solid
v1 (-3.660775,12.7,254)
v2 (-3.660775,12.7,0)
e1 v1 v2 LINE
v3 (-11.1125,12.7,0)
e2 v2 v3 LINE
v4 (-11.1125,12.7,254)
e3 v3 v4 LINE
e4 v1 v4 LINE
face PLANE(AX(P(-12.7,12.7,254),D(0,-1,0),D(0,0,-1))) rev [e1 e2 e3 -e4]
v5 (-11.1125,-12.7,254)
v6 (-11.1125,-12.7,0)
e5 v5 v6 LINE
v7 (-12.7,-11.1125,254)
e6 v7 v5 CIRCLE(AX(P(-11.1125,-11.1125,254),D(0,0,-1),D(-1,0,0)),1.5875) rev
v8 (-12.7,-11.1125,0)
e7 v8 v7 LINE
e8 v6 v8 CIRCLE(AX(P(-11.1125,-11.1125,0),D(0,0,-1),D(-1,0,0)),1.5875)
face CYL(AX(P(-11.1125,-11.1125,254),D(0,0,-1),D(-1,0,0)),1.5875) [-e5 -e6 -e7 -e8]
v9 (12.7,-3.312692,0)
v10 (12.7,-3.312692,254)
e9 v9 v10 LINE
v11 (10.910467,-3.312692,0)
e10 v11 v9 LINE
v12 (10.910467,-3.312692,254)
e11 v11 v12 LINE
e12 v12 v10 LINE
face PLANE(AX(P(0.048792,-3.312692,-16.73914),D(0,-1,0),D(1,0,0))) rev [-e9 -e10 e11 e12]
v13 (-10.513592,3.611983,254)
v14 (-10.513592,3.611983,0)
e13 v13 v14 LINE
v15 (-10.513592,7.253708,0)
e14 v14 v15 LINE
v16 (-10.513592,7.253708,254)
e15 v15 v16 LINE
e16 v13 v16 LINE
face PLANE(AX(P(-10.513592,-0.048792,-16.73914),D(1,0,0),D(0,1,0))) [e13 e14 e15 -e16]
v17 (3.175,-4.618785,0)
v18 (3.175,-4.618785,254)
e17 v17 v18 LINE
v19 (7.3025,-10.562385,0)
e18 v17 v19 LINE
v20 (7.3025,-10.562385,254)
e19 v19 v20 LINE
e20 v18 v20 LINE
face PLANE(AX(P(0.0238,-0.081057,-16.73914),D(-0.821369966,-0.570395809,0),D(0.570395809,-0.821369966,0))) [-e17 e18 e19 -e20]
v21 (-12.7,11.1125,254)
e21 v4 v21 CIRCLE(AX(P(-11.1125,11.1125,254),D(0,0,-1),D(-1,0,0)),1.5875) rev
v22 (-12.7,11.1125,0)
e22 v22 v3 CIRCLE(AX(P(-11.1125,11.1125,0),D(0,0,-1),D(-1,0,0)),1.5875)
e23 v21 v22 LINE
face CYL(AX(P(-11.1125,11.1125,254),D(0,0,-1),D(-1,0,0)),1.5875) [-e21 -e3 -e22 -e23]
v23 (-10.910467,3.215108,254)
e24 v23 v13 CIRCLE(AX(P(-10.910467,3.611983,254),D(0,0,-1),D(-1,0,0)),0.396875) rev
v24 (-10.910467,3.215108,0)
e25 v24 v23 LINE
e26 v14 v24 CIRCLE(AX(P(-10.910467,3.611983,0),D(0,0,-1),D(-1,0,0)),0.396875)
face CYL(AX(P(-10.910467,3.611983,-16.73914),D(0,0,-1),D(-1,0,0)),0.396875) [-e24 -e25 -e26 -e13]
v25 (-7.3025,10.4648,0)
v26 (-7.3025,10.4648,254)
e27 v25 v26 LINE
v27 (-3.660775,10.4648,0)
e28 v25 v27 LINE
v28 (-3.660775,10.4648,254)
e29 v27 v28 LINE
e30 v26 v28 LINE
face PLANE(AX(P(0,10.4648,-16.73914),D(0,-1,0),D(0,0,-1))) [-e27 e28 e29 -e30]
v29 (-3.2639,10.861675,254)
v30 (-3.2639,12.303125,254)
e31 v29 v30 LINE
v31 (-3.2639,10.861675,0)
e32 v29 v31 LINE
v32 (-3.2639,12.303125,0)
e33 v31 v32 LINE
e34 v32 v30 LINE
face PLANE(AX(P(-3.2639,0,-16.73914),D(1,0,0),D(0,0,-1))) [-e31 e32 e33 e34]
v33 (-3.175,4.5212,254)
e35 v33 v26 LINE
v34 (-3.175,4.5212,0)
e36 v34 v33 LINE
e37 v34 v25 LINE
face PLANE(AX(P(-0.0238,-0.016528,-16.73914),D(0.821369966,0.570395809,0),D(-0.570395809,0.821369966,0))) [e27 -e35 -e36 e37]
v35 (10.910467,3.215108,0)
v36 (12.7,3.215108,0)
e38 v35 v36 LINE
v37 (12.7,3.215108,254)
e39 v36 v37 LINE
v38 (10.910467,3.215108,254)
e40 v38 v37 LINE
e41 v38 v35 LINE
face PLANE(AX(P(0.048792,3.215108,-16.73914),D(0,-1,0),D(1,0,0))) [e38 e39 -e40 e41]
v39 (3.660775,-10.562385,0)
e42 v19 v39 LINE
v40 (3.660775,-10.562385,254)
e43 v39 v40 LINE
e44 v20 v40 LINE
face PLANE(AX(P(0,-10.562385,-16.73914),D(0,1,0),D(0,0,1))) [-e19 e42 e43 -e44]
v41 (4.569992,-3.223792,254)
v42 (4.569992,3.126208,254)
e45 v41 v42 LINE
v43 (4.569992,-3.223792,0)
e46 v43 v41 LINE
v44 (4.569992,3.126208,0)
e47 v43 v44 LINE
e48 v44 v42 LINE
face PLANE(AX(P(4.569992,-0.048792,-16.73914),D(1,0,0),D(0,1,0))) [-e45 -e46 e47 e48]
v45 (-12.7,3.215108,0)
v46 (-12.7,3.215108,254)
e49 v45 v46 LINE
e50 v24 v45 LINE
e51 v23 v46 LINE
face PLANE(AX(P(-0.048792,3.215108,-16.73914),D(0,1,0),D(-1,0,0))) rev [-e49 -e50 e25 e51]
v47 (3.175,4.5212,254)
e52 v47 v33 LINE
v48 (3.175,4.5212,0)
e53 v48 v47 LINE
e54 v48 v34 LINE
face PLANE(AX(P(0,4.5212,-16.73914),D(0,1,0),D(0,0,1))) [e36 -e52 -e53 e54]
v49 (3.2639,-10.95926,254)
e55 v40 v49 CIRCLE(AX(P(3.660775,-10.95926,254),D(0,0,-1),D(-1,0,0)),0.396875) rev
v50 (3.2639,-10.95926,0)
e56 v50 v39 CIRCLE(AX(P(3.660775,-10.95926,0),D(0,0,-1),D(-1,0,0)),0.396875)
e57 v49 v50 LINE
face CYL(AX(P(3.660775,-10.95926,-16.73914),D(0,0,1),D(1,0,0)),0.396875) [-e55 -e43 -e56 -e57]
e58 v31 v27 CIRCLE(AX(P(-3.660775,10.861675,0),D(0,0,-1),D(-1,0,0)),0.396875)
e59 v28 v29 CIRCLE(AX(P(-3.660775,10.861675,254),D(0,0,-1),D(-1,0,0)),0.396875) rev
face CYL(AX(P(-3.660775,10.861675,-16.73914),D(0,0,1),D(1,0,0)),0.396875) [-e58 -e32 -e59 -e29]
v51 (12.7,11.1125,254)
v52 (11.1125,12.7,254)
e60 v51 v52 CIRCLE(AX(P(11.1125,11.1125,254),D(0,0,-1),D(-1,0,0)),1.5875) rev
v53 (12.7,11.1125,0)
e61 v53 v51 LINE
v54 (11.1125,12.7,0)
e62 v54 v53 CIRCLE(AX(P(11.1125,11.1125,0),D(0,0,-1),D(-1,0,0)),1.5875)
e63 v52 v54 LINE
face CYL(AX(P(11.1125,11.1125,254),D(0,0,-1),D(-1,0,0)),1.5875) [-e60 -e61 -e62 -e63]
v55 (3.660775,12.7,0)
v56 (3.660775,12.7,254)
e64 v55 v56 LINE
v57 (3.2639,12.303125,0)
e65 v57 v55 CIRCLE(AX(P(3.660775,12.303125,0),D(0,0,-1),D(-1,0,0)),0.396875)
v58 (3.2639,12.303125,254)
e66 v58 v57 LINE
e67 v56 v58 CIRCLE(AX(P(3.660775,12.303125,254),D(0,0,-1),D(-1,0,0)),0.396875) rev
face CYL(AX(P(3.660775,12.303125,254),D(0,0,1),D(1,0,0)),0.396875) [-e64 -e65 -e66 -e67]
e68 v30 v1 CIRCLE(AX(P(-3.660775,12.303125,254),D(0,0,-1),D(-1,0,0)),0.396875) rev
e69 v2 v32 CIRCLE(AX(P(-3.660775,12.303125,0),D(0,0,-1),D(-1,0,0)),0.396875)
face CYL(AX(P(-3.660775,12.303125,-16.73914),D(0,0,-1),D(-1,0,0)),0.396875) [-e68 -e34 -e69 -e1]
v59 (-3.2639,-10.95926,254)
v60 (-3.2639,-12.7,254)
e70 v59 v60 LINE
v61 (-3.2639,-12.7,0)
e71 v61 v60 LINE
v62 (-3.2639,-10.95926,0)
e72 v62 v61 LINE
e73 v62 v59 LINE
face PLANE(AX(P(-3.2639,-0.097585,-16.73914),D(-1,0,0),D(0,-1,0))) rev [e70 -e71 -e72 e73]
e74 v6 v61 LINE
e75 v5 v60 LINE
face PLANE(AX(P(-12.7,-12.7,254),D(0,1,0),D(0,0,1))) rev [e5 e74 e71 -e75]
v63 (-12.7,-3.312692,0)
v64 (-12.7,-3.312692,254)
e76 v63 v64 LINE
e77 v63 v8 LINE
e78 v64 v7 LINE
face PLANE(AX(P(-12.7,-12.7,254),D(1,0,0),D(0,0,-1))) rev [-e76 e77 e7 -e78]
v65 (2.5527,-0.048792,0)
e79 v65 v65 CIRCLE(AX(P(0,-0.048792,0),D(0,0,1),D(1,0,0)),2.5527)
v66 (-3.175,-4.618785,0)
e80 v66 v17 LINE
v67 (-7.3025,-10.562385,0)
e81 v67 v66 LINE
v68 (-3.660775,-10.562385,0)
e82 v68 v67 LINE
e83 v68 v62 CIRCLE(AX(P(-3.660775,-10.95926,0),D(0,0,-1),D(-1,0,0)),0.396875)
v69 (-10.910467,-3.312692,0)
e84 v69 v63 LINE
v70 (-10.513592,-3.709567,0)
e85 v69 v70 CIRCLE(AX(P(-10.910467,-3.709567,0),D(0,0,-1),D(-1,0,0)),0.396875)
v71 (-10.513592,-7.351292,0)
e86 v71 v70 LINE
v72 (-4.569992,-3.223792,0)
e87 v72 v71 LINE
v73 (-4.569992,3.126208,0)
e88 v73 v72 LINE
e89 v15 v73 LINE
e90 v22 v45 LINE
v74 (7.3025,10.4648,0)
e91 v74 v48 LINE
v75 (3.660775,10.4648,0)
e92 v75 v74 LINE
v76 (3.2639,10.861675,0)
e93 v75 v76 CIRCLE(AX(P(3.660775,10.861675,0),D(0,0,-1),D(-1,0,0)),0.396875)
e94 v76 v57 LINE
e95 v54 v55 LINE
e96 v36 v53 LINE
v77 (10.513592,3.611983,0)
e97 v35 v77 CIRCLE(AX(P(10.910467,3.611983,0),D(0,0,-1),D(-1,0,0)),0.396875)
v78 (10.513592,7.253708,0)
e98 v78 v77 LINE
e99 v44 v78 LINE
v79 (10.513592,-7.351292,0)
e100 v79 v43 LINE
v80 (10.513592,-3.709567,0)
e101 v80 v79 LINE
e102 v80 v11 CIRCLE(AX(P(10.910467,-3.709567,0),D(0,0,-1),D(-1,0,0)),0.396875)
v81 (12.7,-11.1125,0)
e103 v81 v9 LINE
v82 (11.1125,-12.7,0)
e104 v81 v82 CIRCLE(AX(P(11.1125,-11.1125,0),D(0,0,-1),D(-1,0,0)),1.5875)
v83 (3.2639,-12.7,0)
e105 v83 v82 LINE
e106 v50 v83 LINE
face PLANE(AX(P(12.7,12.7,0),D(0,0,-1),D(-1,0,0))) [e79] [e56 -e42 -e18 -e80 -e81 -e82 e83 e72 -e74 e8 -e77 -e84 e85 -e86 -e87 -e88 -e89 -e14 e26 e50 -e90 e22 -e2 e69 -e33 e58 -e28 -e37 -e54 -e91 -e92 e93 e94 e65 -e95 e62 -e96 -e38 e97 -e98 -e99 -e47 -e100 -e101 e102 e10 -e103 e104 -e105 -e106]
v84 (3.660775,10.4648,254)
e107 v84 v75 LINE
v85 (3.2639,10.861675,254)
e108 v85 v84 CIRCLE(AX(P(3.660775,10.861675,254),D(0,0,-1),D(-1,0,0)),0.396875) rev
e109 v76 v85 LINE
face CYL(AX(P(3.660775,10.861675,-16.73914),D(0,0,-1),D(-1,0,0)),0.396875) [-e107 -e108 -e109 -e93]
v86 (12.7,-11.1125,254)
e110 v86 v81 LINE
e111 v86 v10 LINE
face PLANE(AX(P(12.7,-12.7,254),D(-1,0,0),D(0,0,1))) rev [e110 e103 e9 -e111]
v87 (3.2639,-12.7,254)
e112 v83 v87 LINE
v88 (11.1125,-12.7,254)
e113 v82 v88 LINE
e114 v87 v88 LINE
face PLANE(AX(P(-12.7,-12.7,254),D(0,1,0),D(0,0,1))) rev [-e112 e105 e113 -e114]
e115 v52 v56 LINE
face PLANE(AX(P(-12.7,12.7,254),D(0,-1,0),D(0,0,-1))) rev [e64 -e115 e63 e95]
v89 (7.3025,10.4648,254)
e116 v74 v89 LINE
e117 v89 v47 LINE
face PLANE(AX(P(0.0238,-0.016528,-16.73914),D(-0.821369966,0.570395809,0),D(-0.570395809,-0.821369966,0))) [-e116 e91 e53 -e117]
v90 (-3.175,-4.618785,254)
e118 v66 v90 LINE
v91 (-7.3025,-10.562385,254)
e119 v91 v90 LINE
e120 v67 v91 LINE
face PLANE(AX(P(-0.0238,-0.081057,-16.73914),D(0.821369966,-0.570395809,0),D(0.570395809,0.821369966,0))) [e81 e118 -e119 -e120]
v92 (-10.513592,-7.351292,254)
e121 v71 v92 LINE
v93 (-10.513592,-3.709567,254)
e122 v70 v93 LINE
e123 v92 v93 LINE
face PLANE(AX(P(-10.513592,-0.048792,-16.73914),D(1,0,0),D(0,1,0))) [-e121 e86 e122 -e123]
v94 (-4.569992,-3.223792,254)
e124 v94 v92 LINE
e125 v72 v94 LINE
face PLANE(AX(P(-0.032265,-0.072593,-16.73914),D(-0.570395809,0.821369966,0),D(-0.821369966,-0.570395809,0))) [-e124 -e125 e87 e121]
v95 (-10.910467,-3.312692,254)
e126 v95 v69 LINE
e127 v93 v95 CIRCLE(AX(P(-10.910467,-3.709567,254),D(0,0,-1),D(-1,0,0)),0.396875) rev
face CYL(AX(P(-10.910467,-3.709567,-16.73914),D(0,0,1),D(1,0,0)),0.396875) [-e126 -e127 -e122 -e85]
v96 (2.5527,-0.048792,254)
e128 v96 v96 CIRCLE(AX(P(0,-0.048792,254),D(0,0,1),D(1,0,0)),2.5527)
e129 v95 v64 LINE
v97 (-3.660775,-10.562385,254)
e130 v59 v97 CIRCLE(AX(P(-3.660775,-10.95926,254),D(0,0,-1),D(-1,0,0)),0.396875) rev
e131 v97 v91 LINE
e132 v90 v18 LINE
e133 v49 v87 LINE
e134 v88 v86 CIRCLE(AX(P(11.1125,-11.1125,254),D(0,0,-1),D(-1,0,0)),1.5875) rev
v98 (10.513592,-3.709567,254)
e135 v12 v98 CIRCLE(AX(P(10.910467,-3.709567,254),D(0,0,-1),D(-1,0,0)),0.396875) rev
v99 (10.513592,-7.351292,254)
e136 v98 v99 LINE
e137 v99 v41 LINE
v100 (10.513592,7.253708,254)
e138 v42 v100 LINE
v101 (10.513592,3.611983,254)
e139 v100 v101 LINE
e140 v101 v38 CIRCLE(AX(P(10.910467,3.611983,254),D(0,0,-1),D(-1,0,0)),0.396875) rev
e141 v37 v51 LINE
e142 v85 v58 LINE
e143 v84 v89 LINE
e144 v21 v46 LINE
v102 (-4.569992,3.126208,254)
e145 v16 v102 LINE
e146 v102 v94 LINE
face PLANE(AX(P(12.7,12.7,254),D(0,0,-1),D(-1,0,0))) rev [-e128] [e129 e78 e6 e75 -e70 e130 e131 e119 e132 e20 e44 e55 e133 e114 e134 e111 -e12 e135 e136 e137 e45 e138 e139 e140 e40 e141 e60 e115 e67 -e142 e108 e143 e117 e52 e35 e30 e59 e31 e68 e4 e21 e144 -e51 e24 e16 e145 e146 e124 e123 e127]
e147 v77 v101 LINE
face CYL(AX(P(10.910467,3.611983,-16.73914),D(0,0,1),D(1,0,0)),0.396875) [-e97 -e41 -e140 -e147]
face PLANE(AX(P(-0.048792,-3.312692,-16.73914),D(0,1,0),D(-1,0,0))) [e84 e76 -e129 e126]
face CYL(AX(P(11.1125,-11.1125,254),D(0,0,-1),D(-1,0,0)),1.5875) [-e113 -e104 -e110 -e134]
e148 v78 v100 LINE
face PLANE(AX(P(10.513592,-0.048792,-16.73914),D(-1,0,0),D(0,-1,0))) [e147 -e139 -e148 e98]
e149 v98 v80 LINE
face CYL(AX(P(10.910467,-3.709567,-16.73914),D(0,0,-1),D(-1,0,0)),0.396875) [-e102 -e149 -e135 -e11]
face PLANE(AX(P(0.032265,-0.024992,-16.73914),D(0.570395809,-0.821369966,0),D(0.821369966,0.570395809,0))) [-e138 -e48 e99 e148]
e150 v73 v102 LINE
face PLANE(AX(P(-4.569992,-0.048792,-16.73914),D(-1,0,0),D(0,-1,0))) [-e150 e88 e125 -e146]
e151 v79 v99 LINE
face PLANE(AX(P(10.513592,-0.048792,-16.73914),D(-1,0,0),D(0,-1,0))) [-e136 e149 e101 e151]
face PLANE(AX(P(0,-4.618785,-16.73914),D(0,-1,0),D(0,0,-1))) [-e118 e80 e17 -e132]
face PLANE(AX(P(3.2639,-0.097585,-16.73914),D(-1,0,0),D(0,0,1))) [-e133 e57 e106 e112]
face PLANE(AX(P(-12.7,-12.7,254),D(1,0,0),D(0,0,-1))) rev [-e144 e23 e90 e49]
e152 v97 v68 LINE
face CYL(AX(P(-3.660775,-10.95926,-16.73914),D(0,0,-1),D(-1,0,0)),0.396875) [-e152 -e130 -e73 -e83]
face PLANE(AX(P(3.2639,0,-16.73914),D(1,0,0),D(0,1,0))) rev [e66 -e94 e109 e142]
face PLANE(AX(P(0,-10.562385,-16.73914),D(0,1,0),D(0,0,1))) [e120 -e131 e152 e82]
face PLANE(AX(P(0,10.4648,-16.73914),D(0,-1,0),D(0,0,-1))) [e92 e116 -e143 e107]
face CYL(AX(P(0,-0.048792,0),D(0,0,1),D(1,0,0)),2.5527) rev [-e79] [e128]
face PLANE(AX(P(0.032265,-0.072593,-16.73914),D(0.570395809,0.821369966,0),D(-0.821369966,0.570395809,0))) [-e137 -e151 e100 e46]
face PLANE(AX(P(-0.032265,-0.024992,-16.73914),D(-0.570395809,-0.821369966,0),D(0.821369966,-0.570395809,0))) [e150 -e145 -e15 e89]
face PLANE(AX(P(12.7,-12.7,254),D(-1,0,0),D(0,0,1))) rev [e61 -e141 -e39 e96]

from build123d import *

# Parameters (mm, degrees)
SKETCH1_W           = 25.4
SKETCH1_H           = 25.4
BOSS_EXTRUDE1_DEPTH = 254
FILLET1_R           = 1.5875
HOLE1_OUTLINE_R     = 2.5527
HOLE1_DEPTH         = 254
SKETCH7_W           = 6.5278
SKETCH7_H           = 2.2352
CUT_EXTRUDE2_DEPTH  = 254
FILLET4_R           = 0.396875
CIRPATTERN2_DEPTH   = 254


# Read off the part's stored shape, not the designer's step: Hole1, CirPattern2
with BuildPart() as part:
    # Sketch1 → Boss-Extrude1 (new body)
    with BuildSketch(Plane.XY):
        Rectangle(SKETCH1_W, SKETCH1_H)
    extrude(amount=BOSS_EXTRUDE1_DEPTH)

    # Fillet1
    fillet1_edges = [part.edges().sort_by_distance(p)[0] for p in [
        (12.7, -12.7, 127),
        (-12.7, -12.7, 127),
        (-12.7, 12.7, 127),
        (12.7, 12.7, 127),
    ]]
    fillet(fillet1_edges, radius=FILLET1_R)

    # Hole1 outline → Hole1 (cut)
    with BuildSketch(Plane.XY):
        with Locations((0, -0.048792482)):
            Circle(HOLE1_OUTLINE_R)
    extrude(amount=HOLE1_DEPTH, mode=Mode.SUBTRACT)

    # Sketch7 → Cut-Extrude2 (cut)
    with BuildSketch(Plane.XY.offset(254)):
        with Locations((0, 11.5824)):
            Rectangle(SKETCH7_W, SKETCH7_H)
        Polygon((-3.175, 4.5212), (-7.3025, 10.4648), (7.3025, 10.4648), (3.175, 4.5212), align=None)
    extrude(amount=-CUT_EXTRUDE2_DEPTH, mode=Mode.SUBTRACT)

    # Fillet4
    fillet4_edges = [part.edges().sort_by_distance(p)[0] for p in [
        (-3.2639, 10.4648, 127),
        (-3.2639, 12.7, 127),
        (3.2639, 12.7, 127),
        (3.2639, 10.4648, 127),
    ]]
    fillet(fillet4_edges, radius=FILLET4_R)

    # CirPattern2 outline → CirPattern2 (cut)
    with BuildSketch(Plane.XY):
        with BuildLine():
            ThreePointArc((-3.660775, -10.562384964), (-3.380141996, -10.67862696), (-3.2639, -10.959259964))
            Line((-3.2639, -10.959259964), (-3.2639, -12.7))
            Line((-3.2639, -12.7), (3.2639, -12.7))
            Line((3.2639, -12.7), (3.2639, -10.959259964))
            ThreePointArc((3.2639, -10.959259964), (3.380141996, -10.67862696), (3.660775, -10.562384964))
            Line((3.660775, -10.562384964), (7.3025, -10.562384964))
            Line((7.3025, -10.562384964), (3.175, -4.618784964))
            Line((3.175, -4.618784964), (-3.175, -4.618784964))
            Line((-3.175, -4.618784964), (-7.3025, -10.562384964))
            Line((-7.3025, -10.562384964), (-3.660775, -10.562384964))
        make_face()
        with BuildLine():
            Line((-12.7, -3.312692482), (-10.910467482, -3.312692482))
            ThreePointArc((-10.910467482, -3.312692482), (-10.629834478, -3.428934478), (-10.513592482, -3.709567482))
            Line((-10.513592482, -3.709567482), (-10.513592482, -7.351292482))
            Line((-10.513592482, -7.351292482), (-4.569992482, -3.223792482))
            Line((-4.569992482, -3.223792482), (-4.569992482, 3.126207518))
            Line((-4.569992482, 3.126207518), (-10.513592482, 7.253707518))
            Line((-10.513592482, 7.253707518), (-10.513592482, 3.611982518))
            ThreePointArc((-10.513592482, 3.611982518), (-10.629834478, 3.331349514), (-10.910467482, 3.215107518))
            Line((-10.910467482, 3.215107518), (-12.7, 3.215107518))
            Line((-12.7, 3.215107518), (-12.7, -3.312692482))
        make_face()
        with BuildLine():
            ThreePointArc((10.513592482, -3.709567482), (10.629834478, -3.428934478), (10.910467482, -3.312692482))
            Line((10.910467482, -3.312692482), (12.7, -3.312692482))
            Line((12.7, -3.312692482), (12.7, 3.215107518))
            Line((12.7, 3.215107518), (10.910467482, 3.215107518))
            ThreePointArc((10.910467482, 3.215107518), (10.629834478, 3.331349514), (10.513592482, 3.611982518))
            Line((10.513592482, 3.611982518), (10.513592482, 7.253707518))
            Line((10.513592482, 7.253707518), (4.569992482, 3.126207518))
            Line((4.569992482, 3.126207518), (4.569992482, -3.223792482))
            Line((4.569992482, -3.223792482), (10.513592482, -7.351292482))
            Line((10.513592482, -7.351292482), (10.513592482, -3.709567482))
        make_face()
    extrude(amount=CIRPATTERN2_DEPTH, mode=Mode.SUBTRACT)


solid = part.part
